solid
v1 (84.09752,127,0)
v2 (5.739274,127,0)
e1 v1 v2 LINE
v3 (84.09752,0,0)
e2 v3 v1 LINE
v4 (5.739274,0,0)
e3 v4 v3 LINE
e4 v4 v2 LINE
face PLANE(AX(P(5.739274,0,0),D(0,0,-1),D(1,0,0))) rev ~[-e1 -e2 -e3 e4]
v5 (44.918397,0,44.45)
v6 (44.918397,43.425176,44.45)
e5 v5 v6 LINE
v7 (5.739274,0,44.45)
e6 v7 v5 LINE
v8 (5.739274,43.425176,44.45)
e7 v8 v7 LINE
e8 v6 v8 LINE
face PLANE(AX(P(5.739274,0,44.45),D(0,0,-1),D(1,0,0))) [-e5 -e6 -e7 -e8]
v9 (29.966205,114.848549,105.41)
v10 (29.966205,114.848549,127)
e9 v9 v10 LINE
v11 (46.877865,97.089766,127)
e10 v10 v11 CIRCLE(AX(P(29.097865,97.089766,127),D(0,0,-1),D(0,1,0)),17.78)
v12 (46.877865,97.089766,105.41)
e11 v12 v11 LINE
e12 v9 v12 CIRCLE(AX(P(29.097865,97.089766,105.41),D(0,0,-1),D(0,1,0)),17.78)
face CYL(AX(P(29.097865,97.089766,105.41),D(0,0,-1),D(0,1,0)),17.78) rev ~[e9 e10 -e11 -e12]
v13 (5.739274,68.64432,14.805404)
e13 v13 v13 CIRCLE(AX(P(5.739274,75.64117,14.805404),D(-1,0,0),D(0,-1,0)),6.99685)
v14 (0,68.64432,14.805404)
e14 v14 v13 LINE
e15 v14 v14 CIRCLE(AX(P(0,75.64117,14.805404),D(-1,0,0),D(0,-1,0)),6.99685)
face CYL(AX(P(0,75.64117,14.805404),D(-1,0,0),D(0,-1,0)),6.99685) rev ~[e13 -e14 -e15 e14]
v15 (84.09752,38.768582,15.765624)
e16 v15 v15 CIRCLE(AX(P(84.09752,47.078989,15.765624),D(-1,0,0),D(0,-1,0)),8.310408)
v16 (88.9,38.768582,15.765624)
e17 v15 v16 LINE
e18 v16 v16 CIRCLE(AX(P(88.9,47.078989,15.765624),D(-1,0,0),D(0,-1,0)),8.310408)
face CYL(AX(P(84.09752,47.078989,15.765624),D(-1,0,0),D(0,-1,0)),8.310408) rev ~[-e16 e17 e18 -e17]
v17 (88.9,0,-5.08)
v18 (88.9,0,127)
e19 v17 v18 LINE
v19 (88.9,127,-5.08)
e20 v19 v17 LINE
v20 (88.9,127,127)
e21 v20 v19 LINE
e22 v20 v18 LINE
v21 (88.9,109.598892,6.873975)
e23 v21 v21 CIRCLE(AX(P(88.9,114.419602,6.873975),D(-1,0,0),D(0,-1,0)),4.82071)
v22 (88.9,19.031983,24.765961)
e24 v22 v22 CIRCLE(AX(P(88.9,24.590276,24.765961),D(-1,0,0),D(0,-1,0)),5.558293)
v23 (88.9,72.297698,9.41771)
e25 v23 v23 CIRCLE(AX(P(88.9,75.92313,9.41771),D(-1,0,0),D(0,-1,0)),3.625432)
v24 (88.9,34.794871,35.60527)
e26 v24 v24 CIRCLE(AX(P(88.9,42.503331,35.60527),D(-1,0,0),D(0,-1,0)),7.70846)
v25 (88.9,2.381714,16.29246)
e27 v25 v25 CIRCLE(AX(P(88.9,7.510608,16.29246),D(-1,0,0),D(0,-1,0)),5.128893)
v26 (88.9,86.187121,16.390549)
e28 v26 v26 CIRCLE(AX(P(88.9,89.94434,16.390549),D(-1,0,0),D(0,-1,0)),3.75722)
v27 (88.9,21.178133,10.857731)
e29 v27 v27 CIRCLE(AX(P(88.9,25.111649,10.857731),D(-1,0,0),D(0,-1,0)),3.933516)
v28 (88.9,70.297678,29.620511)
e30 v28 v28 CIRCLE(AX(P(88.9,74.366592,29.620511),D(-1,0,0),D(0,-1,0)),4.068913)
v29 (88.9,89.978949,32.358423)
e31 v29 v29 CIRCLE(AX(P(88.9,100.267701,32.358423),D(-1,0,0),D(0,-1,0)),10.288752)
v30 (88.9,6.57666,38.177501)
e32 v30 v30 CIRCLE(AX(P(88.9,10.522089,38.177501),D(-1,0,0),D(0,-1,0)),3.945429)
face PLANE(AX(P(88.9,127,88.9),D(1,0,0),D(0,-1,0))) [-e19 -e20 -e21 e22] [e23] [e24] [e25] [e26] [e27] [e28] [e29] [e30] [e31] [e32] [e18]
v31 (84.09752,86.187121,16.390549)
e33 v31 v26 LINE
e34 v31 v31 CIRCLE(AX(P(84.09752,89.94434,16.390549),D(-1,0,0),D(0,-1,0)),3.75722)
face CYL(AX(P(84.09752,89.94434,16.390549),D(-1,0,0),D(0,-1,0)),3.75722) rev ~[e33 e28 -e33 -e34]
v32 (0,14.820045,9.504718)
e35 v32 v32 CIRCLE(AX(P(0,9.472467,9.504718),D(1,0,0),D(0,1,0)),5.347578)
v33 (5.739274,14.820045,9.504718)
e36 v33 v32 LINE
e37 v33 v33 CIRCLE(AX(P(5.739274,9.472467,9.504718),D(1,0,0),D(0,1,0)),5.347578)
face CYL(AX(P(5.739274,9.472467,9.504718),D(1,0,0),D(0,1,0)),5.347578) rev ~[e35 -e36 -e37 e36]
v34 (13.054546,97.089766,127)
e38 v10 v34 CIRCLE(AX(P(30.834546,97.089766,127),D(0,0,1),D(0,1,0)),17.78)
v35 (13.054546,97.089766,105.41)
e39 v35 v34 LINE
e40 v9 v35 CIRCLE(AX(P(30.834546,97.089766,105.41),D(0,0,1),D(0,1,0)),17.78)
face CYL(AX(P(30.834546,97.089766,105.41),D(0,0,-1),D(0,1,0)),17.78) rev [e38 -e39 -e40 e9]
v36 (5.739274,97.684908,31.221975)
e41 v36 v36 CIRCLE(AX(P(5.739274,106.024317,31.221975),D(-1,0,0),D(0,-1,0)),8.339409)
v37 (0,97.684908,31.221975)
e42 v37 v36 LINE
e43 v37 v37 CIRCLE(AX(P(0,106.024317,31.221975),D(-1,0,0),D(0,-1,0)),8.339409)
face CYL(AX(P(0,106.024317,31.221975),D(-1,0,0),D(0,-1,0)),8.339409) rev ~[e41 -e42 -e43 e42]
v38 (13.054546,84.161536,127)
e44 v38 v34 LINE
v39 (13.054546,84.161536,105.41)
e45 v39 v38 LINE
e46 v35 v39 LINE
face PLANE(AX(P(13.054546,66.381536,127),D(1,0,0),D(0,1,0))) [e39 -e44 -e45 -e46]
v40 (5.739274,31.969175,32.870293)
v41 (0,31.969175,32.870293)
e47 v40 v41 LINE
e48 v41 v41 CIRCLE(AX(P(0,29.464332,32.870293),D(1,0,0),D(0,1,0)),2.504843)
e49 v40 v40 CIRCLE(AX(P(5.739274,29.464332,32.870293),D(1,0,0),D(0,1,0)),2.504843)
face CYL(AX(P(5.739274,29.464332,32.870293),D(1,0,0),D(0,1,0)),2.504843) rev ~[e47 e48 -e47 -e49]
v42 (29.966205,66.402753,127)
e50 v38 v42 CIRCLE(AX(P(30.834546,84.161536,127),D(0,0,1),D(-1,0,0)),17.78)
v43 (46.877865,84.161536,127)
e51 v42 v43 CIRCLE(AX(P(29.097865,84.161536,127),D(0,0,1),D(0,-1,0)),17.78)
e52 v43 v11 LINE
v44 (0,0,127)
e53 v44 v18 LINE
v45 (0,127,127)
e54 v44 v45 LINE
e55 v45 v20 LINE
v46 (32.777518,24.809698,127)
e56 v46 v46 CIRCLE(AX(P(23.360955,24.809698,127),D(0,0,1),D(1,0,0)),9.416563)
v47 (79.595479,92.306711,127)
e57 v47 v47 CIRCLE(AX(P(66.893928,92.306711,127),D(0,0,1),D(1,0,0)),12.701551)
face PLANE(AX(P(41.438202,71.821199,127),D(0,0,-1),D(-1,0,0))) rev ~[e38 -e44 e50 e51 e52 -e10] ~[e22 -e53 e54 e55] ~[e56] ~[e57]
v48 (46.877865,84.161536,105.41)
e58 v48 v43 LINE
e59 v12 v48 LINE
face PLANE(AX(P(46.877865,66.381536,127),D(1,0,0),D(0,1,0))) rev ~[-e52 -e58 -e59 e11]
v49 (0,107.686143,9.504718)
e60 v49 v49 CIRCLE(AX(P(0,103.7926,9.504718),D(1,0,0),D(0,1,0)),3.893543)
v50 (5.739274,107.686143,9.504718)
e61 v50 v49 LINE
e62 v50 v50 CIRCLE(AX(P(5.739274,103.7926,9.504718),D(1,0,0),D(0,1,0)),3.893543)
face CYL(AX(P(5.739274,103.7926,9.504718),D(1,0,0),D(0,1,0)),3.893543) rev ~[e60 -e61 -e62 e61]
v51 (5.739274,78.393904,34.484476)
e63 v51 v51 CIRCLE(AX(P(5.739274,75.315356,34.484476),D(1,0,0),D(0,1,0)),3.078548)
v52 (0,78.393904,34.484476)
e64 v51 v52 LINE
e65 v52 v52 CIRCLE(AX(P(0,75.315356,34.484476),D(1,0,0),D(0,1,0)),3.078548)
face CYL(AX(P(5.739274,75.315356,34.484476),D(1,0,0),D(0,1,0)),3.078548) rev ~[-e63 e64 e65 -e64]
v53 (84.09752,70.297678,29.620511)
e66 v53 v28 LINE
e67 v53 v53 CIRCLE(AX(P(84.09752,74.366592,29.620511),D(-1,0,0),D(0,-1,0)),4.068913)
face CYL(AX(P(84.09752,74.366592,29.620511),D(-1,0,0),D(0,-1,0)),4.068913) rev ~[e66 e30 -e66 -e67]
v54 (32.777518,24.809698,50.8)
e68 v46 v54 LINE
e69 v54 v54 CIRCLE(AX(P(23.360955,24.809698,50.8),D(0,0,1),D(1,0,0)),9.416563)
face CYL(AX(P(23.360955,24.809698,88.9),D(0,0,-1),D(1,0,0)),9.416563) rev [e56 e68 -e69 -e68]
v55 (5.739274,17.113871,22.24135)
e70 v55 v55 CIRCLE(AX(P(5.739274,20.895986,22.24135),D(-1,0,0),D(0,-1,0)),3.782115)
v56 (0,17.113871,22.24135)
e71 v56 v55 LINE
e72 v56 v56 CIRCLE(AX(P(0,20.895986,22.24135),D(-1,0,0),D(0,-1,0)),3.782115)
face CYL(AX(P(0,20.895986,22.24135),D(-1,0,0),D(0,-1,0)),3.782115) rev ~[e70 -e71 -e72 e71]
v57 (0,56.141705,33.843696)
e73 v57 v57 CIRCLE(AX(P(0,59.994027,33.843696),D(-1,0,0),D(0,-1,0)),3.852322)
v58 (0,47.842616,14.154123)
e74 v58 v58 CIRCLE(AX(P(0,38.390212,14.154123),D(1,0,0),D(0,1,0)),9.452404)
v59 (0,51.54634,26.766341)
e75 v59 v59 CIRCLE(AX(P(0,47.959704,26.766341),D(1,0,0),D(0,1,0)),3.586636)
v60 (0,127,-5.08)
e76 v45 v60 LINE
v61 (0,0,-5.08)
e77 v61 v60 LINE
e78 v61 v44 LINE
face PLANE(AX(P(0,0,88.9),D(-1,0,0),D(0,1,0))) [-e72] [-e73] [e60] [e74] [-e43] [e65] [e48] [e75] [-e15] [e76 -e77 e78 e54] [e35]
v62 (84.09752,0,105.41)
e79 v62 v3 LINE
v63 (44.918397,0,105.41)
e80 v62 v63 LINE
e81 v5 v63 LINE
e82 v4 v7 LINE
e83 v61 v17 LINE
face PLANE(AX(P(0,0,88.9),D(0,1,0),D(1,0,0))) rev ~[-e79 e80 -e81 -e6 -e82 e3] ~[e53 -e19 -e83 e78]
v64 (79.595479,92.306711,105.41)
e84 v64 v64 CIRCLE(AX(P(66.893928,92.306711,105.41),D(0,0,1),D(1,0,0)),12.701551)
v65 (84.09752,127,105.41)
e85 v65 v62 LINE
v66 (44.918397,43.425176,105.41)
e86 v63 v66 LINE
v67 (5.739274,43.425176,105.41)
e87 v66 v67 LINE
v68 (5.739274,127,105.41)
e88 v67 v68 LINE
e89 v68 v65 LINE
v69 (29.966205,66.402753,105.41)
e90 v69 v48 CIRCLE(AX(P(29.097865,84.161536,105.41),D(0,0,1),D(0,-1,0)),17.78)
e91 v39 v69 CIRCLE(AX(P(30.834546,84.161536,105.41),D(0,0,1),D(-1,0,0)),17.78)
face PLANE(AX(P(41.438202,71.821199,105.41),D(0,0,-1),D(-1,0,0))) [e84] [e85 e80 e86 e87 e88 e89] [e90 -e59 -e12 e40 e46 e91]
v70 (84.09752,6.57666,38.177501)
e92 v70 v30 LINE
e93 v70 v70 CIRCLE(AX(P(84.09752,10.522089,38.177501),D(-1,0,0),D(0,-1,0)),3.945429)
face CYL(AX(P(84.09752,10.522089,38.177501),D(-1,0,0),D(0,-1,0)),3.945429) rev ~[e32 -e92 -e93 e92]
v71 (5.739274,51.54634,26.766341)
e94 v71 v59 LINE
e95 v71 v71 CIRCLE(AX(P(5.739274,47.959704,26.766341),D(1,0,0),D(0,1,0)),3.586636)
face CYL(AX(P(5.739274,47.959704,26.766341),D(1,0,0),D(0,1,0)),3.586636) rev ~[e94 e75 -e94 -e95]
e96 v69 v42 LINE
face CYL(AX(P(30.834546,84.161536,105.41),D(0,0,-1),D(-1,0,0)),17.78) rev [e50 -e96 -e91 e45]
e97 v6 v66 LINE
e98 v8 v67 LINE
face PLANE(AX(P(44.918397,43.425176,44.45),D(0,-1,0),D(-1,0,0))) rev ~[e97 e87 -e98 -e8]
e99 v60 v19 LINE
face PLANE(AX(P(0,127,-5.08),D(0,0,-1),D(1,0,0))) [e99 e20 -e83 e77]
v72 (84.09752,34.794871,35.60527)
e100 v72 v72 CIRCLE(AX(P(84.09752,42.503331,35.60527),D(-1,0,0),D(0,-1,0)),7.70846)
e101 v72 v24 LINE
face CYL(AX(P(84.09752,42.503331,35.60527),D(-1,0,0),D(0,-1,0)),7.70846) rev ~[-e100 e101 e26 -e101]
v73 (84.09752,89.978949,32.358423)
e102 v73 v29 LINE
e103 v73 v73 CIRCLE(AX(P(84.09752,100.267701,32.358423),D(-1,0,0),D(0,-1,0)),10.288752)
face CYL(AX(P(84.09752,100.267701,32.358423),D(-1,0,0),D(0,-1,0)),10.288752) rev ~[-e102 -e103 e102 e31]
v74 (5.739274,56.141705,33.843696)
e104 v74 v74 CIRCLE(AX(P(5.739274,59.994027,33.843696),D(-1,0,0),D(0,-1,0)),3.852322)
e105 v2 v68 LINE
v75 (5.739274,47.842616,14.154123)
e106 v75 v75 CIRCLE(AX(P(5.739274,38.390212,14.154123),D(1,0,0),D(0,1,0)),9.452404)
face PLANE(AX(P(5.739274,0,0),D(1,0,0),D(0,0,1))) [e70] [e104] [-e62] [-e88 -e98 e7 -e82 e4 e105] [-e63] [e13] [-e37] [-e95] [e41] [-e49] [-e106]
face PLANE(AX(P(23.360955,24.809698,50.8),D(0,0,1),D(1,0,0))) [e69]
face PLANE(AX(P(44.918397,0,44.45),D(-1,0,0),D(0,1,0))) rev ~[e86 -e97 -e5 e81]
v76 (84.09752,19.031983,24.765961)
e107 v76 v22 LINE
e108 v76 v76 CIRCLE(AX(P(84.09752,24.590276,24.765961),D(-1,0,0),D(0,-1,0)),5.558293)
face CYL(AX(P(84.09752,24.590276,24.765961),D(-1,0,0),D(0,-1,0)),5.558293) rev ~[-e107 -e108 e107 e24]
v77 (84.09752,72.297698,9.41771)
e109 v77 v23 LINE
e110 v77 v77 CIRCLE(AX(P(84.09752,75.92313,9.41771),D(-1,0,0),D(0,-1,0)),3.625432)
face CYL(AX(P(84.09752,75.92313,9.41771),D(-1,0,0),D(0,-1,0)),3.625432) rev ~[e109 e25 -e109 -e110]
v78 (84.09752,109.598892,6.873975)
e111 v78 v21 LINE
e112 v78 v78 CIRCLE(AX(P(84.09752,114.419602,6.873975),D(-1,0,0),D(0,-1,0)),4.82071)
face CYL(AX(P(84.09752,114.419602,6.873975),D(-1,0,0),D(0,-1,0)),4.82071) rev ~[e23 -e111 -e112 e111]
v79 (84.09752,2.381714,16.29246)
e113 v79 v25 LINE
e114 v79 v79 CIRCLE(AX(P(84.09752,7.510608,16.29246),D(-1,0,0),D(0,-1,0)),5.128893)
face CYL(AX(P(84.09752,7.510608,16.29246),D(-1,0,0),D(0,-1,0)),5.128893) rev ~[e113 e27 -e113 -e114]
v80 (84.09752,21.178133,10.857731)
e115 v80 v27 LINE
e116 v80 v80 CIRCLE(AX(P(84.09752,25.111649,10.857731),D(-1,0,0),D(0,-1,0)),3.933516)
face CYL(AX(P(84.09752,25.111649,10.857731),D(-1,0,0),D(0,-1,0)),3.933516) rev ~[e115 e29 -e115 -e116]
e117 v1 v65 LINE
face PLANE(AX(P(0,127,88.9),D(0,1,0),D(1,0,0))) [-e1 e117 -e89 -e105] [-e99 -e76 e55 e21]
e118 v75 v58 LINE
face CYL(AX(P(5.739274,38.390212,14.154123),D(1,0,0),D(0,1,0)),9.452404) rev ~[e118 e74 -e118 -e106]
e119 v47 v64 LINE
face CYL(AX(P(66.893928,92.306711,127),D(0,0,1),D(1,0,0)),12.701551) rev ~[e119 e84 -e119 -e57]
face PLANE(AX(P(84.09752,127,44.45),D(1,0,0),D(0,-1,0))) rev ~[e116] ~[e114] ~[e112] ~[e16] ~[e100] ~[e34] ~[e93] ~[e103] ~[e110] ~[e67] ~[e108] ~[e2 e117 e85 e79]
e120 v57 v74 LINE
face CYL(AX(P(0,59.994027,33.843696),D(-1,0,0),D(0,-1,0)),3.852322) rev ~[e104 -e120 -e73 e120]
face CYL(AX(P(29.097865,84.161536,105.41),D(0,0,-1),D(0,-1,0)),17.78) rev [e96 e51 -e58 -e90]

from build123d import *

# Parameters (mm, degrees)
F0_W         = 88.9
F0_H         = 127
F1_DEPTH     = 88.9
F3_DEPTH     = 5.08
F4_DEPTH     = 25.4
F2_W         = 78.3582460135
F2_H         = 44.45
F5_DEPTH     = 120.65
F6_DEPTH     = 25.4
F7_R         = 9.4165633134
F8_DEPTH     = 38.1
F9_DEPTH     = 38.1
F10_DEPTH    = 25.4
F11_DEPTH    = 101.6
F12_R        = 3.7821151403
F13_DEPTH    = 25.4
F14_R        = 8.3394092173
F15_DEPTH    = 25.4
F16_R        = 6.9968499513
F17_DEPTH    = 25.4
F18_R        = 3.8523221967
F19_DEPTH    = 25.4
F20_R        = 9.4524039115
F21_DEPTH    = 25.4
F22_R        = 3.8935430456
F22_R_2      = 2.5048426579
F22_R_3      = 5.3475780775
F22_R_4      = 3.5866360784
F22_R_5      = 3.0785479475
F23_DEPTH    = 25.4
F24_R        = 10.2887517637
F24_R_2      = 3.7572197848
F24_R_3      = 4.8207100709
F24_R_4      = 7.7084596518
F24_R_5      = 4.0689133859
F24_R_6      = 8.3104077663
F24_R_7      = 5.128893449
F24_R_8      = 5.5582930393
F24_R_9      = 3.9454288103
F24_R_10     = 3.6254323416
F24_R_11     = 3.933516476
F25_DEPTH    = 25.4
F27_DEPTH    = 60.96
F28_W        = 33.8233187795
F28_H        = 48.4882295132
F29_DEPTH    = 25.4
F30_T1_DEPTH = 21.59
F31_R        = 12.7015512299
F32_DEPTH    = 25.4


# Not quite as in the source:
# - a fillet or chamfer that OpenCascade refuses, or shapes differently, is made with other operations: its cross-section is extruded or revolved along the edge and cut away or added


with BuildPart() as f1:
    # F0 (on Top) → F1 (new body)
    with BuildSketch(Plane.XY):
        with Locations((44.45, 63.5)):
            Rectangle(F0_W, F0_H)
    extrude(amount=F1_DEPTH)

    # F3 (add): a face of the model
    f3_faces = [f1.faces().sort_by_distance(p)[0] for p in [
        (44.45, 63.5, 0),
    ]]
    extrude(f3_faces, amount=F3_DEPTH)

    # F4 (add): a face of the model
    f4_faces = [f1.faces().sort_by_distance(p)[0] for p in [
        (44.45, 127, 41.91),
    ]]
    extrude(f4_faces, amount=F4_DEPTH)

    # F2 (on face) → F5 (cut)
    with BuildSketch(Plane.XZ):
        with Locations((44.9183965102, 22.225)):
            Rectangle(F2_W, F2_H)
    extrude(amount=-F5_DEPTH, mode=Mode.SUBTRACT)

    # F6 (cut): a face of the model
    f6_faces = [f1.faces().sort_by_distance(p)[0] for p in [
        (44.45, 152.4, 41.91),
    ]]
    extrude(f6_faces, amount=-F6_DEPTH, mode=Mode.SUBTRACT)

    # F7 (on face) → F8 (cut)
    with BuildSketch(Plane.XY.offset(88.9)):
        with Locations((23.3609545976, 24.8096976429)):
            Circle(F7_R)
    extrude(amount=-F8_DEPTH, mode=Mode.SUBTRACT)

    # F9 (add): a face of the model
    f9_faces = [f1.faces().sort_by_distance(p)[0] for p in [
        (44.9835020735, 64.4787714966, 88.9),
    ]]
    extrude(f9_faces, amount=F9_DEPTH)

    # F10 (add): a face of the model
    f10_faces = [f1.faces().sort_by_distance(p)[0] for p in [
        (44.9183965102, 120.65, 22.225),
    ]]
    extrude(f10_faces, amount=F10_DEPTH)

    # F11 (cut): a face of the model
    f11_faces = [f1.faces().sort_by_distance(p)[0] for p in [
        (44.9183965102, 95.25, 22.225),
    ]]
    extrude(f11_faces, amount=-F11_DEPTH, mode=Mode.SUBTRACT)

    # F12 (on face) → F13 (cut)
    with BuildSketch(Plane(origin=(0, 0, 0), x_dir=(0, -1, 0), z_dir=(-1, 0, 0))):
        with Locations((-20.8959858865, 22.2413502634)):
            Circle(F12_R)
    extrude(amount=-F13_DEPTH, mode=Mode.SUBTRACT)

    # F14 (on face) → F15 (cut)
    with BuildSketch(Plane(origin=(0, 0, 0), x_dir=(0, -1, 0), z_dir=(-1, 0, 0))):
        with Locations((-106.0243174434, 31.2219746411)):
            Circle(F14_R)
    extrude(amount=-F15_DEPTH, mode=Mode.SUBTRACT)

    # F16 (on face) → F17 (cut)
    with BuildSketch(Plane(origin=(0, 0, 0), x_dir=(0, -1, 0), z_dir=(-1, 0, 0))):
        with Locations((-75.6411701441, 14.8054044694)):
            Circle(F16_R)
    extrude(amount=-F17_DEPTH, mode=Mode.SUBTRACT)

    # F18 (on face) → F19 (cut)
    with BuildSketch(Plane(origin=(0, 0, 0), x_dir=(0, -1, 0), z_dir=(-1, 0, 0))):
        with Locations((-59.9940270185, 33.8436961174)):
            Circle(F18_R)
    extrude(amount=-F19_DEPTH, mode=Mode.SUBTRACT)

    # F20 (on face) → F21 (cut)
    with BuildSketch(Plane.YZ.offset(5.7392735034)):
        with Locations((38.390211761, 14.1541231424)):
            Circle(F20_R)
    extrude(amount=-F21_DEPTH, mode=Mode.SUBTRACT)

    # F22 (on face) → F23 (cut)
    with BuildSketch(Plane.YZ.offset(5.7392735034)):
        with Locations((103.7926003337, 9.5047177747)):
            Circle(F22_R)
        with Locations((29.4643323869, 32.8702926636)):
            Circle(F22_R_2)
        with Locations((9.4724670053, 9.5047177747)):
            Circle(F22_R_3)
        with Locations((47.9597039521, 26.7663411796)):
            Circle(F22_R_4)
        with Locations((75.3153562546, 34.4844758511)):
            Circle(F22_R_5)
    extrude(amount=-F23_DEPTH, mode=Mode.SUBTRACT)

    # F24 (on face) → F25 (cut)
    with BuildSketch(Plane(origin=(84.0975195169, 0, 0), x_dir=(0, -1, 0), z_dir=(-1, 0, 0))):
        with Locations((-100.267700851, 32.3584228754)):
            Circle(F24_R)
        with Locations((-89.9443402886, 16.390549019)):
            Circle(F24_R_2)
        with Locations((-114.4196018577, 6.8739750423)):
            Circle(F24_R_3)
        with Locations((-42.5033308566, 35.6052704155)):
            Circle(F24_R_4)
        with Locations((-74.3665918708, 29.6205114573)):
            Circle(F24_R_5)
        with Locations((-47.0789894462, 15.7656241208)):
            Circle(F24_R_6)
        with Locations((-7.5106075965, 16.2924602628)):
            Circle(F24_R_7)
        with Locations((-24.5902761817, 24.7659608722)):
            Circle(F24_R_8)
        with Locations((-10.5220889673, 38.1775014102)):
            Circle(F24_R_9)
        with Locations((-75.9231299162, 9.4177098945)):
            Circle(F24_R_10)
        with Locations((-25.1116491854, 10.8577311039)):
            Circle(F24_R_11)
    extrude(amount=-F25_DEPTH, mode=Mode.SUBTRACT)

    # F26 (on face) → F27 (cut)
    with BuildSketch(Plane(origin=(0, 0, 44.45), x_dir=(1, 0, 0), z_dir=(0, 0, -1))):
        Polygon((84.0975195169, 0), (44.9183965102, 0), (44.9183965102, -43.4251762927), (5.7392735034, -43.4251762927), (5.7392735034, -127), (84.0975195169, -127), align=None)
    extrude(amount=-F27_DEPTH, mode=Mode.SUBTRACT)

    # F28 (on face) → F29 (cut)
    with BuildSketch(Plane.XY.offset(127)):
        with Locations((29.9662053585, 90.6256511807)):
            Rectangle(F28_W, F28_H)
    extrude(amount=-F29_DEPTH, mode=Mode.SUBTRACT)

    # F30: fillet of radius 17.78 on 4 edges, made by hand

    # F30_s2 → F30_t1 (join)
    with BuildSketch(Plane.XY.offset(105.41)):
        with BuildLine():
            ThreePointArc((29.0978647482, 66.3815364242), (41.6702233177, 71.5891778547), (46.8778647482, 84.1615364242))
            Line((46.8778647482, 84.1615364242), (46.8778647482, 66.3815364242))
            Line((46.8778647482, 66.3815364242), (29.0978647482, 66.3815364242))
        make_face()
        with BuildLine():
            ThreePointArc((13.0545459688, 84.1615364242), (18.2621873993, 71.5891778547), (30.8345459688, 66.3815364242))
            Line((30.8345459688, 66.3815364242), (13.0545459688, 66.3815364242))
            Line((13.0545459688, 66.3815364242), (13.0545459688, 84.1615364242))
        make_face()
        with BuildLine():
            ThreePointArc((29.0978647482, 114.8697659373), (41.6702233177, 109.6621245068), (46.8778647482, 97.0897659373))
            Line((46.8778647482, 97.0897659373), (46.8778647482, 114.8697659373))
            Line((46.8778647482, 114.8697659373), (29.0978647482, 114.8697659373))
        make_face()
        with BuildLine():
            ThreePointArc((30.8345459688, 114.8697659373), (18.2621873993, 109.6621245068), (13.0545459688, 97.0897659373))
            Line((13.0545459688, 97.0897659373), (13.0545459688, 114.8697659373))
            Line((13.0545459688, 114.8697659373), (30.8345459688, 114.8697659373))
        make_face()
    extrude(amount=F30_T1_DEPTH)

    # F31 (on face) → F32 (cut)
    with BuildSketch(Plane.XY.offset(127)):
        with Locations((66.893927753, 92.3067107797)):
            Circle(F31_R)
    extrude(amount=-F32_DEPTH, mode=Mode.SUBTRACT)


solid = f1.part
